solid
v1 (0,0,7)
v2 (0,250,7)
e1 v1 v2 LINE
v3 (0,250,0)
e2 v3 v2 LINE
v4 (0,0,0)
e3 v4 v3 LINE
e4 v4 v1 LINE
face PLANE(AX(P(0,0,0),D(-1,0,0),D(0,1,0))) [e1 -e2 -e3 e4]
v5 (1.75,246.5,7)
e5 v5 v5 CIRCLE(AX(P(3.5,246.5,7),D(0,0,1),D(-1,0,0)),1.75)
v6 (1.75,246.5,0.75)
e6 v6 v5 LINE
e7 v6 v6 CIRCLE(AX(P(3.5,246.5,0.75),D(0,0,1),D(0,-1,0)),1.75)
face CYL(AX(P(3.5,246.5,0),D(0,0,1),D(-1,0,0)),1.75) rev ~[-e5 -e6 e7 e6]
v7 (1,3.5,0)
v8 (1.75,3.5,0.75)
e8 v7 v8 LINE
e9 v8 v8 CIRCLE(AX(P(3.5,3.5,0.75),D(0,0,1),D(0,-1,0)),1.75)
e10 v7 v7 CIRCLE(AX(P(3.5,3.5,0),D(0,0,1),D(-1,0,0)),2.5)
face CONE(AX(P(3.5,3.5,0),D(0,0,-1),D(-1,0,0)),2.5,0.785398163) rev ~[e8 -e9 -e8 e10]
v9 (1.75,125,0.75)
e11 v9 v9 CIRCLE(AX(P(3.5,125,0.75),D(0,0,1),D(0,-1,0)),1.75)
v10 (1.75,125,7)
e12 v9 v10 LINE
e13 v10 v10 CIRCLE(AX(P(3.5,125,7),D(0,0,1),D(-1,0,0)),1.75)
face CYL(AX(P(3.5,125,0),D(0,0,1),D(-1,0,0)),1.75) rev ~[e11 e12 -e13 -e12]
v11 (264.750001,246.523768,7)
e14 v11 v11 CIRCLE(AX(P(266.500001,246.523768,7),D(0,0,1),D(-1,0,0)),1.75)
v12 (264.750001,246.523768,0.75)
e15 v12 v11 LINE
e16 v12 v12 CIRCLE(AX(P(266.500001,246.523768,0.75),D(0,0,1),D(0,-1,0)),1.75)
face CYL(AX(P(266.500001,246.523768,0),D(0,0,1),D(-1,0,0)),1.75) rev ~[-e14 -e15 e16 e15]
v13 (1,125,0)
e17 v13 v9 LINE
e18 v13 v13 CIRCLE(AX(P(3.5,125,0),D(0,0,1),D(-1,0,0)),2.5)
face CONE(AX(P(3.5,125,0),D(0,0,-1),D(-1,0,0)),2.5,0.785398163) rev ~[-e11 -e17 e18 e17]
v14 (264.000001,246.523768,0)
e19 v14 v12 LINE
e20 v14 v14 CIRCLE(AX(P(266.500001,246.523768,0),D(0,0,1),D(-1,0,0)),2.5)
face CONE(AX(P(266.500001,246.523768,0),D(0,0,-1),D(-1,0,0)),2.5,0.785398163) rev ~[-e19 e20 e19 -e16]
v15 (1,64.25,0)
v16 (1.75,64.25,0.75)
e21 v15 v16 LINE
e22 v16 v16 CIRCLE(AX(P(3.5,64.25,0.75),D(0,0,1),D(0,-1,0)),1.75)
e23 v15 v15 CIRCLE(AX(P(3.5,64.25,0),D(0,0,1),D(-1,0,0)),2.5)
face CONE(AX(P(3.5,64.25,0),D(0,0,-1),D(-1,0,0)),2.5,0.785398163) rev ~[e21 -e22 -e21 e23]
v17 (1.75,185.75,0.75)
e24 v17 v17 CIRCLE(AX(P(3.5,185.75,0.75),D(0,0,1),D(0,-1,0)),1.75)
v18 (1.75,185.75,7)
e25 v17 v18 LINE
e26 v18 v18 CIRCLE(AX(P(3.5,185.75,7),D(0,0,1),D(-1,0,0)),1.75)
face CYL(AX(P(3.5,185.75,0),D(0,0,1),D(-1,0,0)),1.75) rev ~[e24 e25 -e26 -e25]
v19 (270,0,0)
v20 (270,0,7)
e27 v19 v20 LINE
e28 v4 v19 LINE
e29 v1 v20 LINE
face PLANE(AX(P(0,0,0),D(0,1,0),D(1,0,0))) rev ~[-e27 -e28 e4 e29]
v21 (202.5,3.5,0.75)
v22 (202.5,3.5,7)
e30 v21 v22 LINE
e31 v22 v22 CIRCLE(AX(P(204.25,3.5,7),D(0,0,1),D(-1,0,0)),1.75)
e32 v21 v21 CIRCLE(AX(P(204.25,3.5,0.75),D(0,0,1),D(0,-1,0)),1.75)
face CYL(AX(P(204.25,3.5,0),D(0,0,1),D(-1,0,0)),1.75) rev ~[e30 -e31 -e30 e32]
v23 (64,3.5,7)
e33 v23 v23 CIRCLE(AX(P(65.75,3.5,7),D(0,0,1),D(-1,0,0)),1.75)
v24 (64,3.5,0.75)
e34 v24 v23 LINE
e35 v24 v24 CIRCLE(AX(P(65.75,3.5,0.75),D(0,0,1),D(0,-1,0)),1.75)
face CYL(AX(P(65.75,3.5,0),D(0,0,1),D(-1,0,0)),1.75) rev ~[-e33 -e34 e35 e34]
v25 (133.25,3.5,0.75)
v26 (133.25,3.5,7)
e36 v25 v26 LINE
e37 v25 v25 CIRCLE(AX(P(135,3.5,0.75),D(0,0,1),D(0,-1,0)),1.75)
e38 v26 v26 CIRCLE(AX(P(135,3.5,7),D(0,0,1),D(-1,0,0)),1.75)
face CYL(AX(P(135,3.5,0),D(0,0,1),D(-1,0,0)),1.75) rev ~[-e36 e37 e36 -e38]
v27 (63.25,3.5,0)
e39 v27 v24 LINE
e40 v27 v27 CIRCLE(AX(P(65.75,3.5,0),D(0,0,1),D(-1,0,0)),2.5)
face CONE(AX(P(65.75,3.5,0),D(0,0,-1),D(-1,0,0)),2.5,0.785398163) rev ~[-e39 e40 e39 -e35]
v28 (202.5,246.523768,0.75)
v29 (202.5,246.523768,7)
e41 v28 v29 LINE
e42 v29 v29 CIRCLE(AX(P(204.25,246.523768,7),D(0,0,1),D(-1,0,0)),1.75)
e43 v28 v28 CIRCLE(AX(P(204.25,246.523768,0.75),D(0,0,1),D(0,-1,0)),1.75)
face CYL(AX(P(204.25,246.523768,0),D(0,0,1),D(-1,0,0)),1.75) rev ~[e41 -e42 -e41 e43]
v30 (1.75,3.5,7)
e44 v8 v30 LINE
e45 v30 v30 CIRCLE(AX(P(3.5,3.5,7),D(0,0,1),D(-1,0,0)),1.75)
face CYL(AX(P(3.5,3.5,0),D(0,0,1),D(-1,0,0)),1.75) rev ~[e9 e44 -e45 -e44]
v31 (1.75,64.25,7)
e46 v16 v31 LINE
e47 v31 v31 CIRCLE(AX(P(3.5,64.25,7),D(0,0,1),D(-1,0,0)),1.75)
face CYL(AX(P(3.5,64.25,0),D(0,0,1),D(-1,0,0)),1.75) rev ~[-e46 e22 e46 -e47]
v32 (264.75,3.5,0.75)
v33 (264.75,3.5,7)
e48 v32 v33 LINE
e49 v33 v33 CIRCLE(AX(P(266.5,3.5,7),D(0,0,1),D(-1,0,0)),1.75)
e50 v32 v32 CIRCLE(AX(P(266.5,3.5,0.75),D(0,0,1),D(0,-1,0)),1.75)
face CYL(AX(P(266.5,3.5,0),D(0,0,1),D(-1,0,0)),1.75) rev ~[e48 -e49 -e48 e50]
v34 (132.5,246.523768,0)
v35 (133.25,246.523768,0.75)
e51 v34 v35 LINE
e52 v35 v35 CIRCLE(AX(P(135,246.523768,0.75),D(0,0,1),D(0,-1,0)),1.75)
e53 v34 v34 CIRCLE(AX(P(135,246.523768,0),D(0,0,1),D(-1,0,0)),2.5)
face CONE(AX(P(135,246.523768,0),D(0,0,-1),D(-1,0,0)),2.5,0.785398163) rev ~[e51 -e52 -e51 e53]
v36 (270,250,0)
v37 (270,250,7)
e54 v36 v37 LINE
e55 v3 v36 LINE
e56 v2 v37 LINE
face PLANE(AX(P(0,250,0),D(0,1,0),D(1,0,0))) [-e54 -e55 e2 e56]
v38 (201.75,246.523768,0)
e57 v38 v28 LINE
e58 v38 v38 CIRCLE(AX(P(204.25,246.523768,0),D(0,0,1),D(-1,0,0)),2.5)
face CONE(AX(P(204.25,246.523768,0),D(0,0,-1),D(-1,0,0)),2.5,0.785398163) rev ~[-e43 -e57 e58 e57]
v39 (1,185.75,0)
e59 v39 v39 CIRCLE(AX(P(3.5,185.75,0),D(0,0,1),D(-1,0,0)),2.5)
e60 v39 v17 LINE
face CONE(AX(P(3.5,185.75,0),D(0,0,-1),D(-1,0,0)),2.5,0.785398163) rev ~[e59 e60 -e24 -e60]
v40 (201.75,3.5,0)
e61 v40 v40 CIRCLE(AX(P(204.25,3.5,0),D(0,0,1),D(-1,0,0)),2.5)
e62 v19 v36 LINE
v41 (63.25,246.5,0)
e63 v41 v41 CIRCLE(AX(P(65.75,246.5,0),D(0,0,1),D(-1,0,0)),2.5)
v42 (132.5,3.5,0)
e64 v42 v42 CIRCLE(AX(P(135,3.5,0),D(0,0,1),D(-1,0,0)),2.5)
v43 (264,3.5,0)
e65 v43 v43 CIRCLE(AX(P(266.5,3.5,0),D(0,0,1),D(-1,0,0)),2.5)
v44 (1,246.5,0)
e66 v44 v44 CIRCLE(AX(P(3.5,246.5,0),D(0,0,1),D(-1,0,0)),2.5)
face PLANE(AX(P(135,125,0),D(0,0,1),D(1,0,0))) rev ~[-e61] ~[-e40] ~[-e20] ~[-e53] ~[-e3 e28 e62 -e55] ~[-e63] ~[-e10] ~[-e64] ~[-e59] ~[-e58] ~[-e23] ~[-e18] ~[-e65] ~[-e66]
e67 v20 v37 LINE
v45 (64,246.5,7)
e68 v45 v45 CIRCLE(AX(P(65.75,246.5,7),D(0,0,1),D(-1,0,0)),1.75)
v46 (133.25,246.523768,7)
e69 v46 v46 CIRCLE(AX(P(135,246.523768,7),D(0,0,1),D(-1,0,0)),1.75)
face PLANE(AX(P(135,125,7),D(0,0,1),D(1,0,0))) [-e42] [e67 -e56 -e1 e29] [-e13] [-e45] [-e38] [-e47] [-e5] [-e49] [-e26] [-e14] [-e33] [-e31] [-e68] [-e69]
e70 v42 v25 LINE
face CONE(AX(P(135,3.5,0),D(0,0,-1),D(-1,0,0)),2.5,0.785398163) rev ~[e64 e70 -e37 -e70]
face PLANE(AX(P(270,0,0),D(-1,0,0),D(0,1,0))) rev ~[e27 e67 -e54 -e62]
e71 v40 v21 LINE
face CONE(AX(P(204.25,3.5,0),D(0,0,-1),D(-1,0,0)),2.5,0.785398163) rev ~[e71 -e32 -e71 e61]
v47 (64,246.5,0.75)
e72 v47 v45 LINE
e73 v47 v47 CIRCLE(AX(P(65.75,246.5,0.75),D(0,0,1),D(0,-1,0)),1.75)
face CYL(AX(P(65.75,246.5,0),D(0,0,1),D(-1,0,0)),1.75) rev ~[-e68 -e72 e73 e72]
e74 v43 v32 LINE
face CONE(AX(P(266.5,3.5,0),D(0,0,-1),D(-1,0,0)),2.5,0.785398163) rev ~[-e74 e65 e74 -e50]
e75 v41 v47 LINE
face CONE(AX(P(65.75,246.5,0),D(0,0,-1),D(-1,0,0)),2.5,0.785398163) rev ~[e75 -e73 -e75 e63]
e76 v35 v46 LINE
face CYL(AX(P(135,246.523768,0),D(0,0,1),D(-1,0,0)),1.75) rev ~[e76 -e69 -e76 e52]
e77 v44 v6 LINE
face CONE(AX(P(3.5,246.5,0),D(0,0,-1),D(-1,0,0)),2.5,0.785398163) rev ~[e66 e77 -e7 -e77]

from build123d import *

# Parameters (mm, degrees)
F0_W            = 270
F0_H            = 250
F4_REACH        = 517.9673898595
F5_W            = 263
F5_H            = 236
F6_DEPTH        = 36
F8_DEPTH        = 250.001
F10_D           = 3.5
F10_DEPTH       = 12
F10_TIP         = 1.0515060833
F13_W           = 270
F13_H           = 250
F14_DEPTH       = 7
F15_D           = 3.5
F15_CSINK_D     = 5
F15_CSINK_ANGLE = 90


with BuildPart() as f4:
    f4_end = Plane(origin=(25.6515107494, 0, -145.4769465589), x_dir=(0.984807753, 0, 0.1736481777), z_dir=(-0.1736481777, 0, 0.984807753))
    # F0 (on Top) → F4 (new body, up to a plane its end follows)
    with BuildSketch(Plane.XY):
        with Locations((135, 125)):
            Rectangle(F0_W, F0_H)
    f4_long = extrude(amount=-F4_REACH, mode=Mode.PRIVATE)
    add(split(f4_long, bisect_by=f4_end, keep=Keep.TOP, mode=Mode.PRIVATE))

    # F5 (on face) → F6 (cut)
    with BuildSketch(Plane.XY):
        with Locations((138.5, 125)):
            Rectangle(F5_W, F5_H)
    extrude(amount=-F6_DEPTH, mode=Mode.SUBTRACT)

    # F7 (on face) → F8 (cut, through all)
    with BuildSketch(Plane.XZ):
        with BuildLine():
            Line((270, -42.8751187269), (216.5270364467, -52.3038449398))
            ThreePointArc((216.5270364467, -52.3038449398), (200.3038449398, -75.4729635533), (223.4729635533, -91.6961550602))
            Line((223.4729635533, -91.6961550602), (270, -83.4921832023))
            Line((270, -83.4921832023), (270, -42.8751187269))
        make_face()
    extrude(amount=-F8_DEPTH, mode=Mode.SUBTRACT)

    # F10
    with Locations(Plane.XY):
        with Locations((3.5, 64.25), (3.5, 125), (3.5, 185.75), (3.5, 246.5), (3.5, 3.5), (65.75, 3.5), (135, 3.5), (204.25, 3.5), (266.5, 3.5), (266.500000929, 246.5237677097), (204.25, 246.5237677097), (135, 246.5237677097), (65.75, 246.5)):
            Hole(F10_D / 2, depth=F10_DEPTH)
            with Locations((0, 0, -(F10_DEPTH + F10_TIP / 2))):  # 118° drill point
                Cone(0, F10_D / 2, F10_TIP, mode=Mode.SUBTRACT)


with BuildPart() as f14:
    # F13 (on face) → F14 (new body)
    with BuildSketch(Plane.XY):
        with Locations((135, 125)):
            Rectangle(F13_W, F13_H)
    extrude(amount=F14_DEPTH)

    # F15 (through all)
    with Locations(Plane(origin=(0, 0, 0), x_dir=(1, 0, 0), z_dir=(0, 0, -1))):
        with Locations((3.5, -246.5), (65.75, -246.5), (135, -246.5237677097), (204.25, -246.5237677097), (266.500000929, -246.5237677097), (3.5, -185.75), (3.5, -125), (3.5, -64.25), (3.5, -3.5), (65.75, -3.5), (135, -3.5), (204.25, -3.5), (266.5, -3.5)):
            CounterSinkHole(F15_D / 2, F15_CSINK_D / 2, counter_sink_angle=F15_CSINK_ANGLE)


solid = f14.part
